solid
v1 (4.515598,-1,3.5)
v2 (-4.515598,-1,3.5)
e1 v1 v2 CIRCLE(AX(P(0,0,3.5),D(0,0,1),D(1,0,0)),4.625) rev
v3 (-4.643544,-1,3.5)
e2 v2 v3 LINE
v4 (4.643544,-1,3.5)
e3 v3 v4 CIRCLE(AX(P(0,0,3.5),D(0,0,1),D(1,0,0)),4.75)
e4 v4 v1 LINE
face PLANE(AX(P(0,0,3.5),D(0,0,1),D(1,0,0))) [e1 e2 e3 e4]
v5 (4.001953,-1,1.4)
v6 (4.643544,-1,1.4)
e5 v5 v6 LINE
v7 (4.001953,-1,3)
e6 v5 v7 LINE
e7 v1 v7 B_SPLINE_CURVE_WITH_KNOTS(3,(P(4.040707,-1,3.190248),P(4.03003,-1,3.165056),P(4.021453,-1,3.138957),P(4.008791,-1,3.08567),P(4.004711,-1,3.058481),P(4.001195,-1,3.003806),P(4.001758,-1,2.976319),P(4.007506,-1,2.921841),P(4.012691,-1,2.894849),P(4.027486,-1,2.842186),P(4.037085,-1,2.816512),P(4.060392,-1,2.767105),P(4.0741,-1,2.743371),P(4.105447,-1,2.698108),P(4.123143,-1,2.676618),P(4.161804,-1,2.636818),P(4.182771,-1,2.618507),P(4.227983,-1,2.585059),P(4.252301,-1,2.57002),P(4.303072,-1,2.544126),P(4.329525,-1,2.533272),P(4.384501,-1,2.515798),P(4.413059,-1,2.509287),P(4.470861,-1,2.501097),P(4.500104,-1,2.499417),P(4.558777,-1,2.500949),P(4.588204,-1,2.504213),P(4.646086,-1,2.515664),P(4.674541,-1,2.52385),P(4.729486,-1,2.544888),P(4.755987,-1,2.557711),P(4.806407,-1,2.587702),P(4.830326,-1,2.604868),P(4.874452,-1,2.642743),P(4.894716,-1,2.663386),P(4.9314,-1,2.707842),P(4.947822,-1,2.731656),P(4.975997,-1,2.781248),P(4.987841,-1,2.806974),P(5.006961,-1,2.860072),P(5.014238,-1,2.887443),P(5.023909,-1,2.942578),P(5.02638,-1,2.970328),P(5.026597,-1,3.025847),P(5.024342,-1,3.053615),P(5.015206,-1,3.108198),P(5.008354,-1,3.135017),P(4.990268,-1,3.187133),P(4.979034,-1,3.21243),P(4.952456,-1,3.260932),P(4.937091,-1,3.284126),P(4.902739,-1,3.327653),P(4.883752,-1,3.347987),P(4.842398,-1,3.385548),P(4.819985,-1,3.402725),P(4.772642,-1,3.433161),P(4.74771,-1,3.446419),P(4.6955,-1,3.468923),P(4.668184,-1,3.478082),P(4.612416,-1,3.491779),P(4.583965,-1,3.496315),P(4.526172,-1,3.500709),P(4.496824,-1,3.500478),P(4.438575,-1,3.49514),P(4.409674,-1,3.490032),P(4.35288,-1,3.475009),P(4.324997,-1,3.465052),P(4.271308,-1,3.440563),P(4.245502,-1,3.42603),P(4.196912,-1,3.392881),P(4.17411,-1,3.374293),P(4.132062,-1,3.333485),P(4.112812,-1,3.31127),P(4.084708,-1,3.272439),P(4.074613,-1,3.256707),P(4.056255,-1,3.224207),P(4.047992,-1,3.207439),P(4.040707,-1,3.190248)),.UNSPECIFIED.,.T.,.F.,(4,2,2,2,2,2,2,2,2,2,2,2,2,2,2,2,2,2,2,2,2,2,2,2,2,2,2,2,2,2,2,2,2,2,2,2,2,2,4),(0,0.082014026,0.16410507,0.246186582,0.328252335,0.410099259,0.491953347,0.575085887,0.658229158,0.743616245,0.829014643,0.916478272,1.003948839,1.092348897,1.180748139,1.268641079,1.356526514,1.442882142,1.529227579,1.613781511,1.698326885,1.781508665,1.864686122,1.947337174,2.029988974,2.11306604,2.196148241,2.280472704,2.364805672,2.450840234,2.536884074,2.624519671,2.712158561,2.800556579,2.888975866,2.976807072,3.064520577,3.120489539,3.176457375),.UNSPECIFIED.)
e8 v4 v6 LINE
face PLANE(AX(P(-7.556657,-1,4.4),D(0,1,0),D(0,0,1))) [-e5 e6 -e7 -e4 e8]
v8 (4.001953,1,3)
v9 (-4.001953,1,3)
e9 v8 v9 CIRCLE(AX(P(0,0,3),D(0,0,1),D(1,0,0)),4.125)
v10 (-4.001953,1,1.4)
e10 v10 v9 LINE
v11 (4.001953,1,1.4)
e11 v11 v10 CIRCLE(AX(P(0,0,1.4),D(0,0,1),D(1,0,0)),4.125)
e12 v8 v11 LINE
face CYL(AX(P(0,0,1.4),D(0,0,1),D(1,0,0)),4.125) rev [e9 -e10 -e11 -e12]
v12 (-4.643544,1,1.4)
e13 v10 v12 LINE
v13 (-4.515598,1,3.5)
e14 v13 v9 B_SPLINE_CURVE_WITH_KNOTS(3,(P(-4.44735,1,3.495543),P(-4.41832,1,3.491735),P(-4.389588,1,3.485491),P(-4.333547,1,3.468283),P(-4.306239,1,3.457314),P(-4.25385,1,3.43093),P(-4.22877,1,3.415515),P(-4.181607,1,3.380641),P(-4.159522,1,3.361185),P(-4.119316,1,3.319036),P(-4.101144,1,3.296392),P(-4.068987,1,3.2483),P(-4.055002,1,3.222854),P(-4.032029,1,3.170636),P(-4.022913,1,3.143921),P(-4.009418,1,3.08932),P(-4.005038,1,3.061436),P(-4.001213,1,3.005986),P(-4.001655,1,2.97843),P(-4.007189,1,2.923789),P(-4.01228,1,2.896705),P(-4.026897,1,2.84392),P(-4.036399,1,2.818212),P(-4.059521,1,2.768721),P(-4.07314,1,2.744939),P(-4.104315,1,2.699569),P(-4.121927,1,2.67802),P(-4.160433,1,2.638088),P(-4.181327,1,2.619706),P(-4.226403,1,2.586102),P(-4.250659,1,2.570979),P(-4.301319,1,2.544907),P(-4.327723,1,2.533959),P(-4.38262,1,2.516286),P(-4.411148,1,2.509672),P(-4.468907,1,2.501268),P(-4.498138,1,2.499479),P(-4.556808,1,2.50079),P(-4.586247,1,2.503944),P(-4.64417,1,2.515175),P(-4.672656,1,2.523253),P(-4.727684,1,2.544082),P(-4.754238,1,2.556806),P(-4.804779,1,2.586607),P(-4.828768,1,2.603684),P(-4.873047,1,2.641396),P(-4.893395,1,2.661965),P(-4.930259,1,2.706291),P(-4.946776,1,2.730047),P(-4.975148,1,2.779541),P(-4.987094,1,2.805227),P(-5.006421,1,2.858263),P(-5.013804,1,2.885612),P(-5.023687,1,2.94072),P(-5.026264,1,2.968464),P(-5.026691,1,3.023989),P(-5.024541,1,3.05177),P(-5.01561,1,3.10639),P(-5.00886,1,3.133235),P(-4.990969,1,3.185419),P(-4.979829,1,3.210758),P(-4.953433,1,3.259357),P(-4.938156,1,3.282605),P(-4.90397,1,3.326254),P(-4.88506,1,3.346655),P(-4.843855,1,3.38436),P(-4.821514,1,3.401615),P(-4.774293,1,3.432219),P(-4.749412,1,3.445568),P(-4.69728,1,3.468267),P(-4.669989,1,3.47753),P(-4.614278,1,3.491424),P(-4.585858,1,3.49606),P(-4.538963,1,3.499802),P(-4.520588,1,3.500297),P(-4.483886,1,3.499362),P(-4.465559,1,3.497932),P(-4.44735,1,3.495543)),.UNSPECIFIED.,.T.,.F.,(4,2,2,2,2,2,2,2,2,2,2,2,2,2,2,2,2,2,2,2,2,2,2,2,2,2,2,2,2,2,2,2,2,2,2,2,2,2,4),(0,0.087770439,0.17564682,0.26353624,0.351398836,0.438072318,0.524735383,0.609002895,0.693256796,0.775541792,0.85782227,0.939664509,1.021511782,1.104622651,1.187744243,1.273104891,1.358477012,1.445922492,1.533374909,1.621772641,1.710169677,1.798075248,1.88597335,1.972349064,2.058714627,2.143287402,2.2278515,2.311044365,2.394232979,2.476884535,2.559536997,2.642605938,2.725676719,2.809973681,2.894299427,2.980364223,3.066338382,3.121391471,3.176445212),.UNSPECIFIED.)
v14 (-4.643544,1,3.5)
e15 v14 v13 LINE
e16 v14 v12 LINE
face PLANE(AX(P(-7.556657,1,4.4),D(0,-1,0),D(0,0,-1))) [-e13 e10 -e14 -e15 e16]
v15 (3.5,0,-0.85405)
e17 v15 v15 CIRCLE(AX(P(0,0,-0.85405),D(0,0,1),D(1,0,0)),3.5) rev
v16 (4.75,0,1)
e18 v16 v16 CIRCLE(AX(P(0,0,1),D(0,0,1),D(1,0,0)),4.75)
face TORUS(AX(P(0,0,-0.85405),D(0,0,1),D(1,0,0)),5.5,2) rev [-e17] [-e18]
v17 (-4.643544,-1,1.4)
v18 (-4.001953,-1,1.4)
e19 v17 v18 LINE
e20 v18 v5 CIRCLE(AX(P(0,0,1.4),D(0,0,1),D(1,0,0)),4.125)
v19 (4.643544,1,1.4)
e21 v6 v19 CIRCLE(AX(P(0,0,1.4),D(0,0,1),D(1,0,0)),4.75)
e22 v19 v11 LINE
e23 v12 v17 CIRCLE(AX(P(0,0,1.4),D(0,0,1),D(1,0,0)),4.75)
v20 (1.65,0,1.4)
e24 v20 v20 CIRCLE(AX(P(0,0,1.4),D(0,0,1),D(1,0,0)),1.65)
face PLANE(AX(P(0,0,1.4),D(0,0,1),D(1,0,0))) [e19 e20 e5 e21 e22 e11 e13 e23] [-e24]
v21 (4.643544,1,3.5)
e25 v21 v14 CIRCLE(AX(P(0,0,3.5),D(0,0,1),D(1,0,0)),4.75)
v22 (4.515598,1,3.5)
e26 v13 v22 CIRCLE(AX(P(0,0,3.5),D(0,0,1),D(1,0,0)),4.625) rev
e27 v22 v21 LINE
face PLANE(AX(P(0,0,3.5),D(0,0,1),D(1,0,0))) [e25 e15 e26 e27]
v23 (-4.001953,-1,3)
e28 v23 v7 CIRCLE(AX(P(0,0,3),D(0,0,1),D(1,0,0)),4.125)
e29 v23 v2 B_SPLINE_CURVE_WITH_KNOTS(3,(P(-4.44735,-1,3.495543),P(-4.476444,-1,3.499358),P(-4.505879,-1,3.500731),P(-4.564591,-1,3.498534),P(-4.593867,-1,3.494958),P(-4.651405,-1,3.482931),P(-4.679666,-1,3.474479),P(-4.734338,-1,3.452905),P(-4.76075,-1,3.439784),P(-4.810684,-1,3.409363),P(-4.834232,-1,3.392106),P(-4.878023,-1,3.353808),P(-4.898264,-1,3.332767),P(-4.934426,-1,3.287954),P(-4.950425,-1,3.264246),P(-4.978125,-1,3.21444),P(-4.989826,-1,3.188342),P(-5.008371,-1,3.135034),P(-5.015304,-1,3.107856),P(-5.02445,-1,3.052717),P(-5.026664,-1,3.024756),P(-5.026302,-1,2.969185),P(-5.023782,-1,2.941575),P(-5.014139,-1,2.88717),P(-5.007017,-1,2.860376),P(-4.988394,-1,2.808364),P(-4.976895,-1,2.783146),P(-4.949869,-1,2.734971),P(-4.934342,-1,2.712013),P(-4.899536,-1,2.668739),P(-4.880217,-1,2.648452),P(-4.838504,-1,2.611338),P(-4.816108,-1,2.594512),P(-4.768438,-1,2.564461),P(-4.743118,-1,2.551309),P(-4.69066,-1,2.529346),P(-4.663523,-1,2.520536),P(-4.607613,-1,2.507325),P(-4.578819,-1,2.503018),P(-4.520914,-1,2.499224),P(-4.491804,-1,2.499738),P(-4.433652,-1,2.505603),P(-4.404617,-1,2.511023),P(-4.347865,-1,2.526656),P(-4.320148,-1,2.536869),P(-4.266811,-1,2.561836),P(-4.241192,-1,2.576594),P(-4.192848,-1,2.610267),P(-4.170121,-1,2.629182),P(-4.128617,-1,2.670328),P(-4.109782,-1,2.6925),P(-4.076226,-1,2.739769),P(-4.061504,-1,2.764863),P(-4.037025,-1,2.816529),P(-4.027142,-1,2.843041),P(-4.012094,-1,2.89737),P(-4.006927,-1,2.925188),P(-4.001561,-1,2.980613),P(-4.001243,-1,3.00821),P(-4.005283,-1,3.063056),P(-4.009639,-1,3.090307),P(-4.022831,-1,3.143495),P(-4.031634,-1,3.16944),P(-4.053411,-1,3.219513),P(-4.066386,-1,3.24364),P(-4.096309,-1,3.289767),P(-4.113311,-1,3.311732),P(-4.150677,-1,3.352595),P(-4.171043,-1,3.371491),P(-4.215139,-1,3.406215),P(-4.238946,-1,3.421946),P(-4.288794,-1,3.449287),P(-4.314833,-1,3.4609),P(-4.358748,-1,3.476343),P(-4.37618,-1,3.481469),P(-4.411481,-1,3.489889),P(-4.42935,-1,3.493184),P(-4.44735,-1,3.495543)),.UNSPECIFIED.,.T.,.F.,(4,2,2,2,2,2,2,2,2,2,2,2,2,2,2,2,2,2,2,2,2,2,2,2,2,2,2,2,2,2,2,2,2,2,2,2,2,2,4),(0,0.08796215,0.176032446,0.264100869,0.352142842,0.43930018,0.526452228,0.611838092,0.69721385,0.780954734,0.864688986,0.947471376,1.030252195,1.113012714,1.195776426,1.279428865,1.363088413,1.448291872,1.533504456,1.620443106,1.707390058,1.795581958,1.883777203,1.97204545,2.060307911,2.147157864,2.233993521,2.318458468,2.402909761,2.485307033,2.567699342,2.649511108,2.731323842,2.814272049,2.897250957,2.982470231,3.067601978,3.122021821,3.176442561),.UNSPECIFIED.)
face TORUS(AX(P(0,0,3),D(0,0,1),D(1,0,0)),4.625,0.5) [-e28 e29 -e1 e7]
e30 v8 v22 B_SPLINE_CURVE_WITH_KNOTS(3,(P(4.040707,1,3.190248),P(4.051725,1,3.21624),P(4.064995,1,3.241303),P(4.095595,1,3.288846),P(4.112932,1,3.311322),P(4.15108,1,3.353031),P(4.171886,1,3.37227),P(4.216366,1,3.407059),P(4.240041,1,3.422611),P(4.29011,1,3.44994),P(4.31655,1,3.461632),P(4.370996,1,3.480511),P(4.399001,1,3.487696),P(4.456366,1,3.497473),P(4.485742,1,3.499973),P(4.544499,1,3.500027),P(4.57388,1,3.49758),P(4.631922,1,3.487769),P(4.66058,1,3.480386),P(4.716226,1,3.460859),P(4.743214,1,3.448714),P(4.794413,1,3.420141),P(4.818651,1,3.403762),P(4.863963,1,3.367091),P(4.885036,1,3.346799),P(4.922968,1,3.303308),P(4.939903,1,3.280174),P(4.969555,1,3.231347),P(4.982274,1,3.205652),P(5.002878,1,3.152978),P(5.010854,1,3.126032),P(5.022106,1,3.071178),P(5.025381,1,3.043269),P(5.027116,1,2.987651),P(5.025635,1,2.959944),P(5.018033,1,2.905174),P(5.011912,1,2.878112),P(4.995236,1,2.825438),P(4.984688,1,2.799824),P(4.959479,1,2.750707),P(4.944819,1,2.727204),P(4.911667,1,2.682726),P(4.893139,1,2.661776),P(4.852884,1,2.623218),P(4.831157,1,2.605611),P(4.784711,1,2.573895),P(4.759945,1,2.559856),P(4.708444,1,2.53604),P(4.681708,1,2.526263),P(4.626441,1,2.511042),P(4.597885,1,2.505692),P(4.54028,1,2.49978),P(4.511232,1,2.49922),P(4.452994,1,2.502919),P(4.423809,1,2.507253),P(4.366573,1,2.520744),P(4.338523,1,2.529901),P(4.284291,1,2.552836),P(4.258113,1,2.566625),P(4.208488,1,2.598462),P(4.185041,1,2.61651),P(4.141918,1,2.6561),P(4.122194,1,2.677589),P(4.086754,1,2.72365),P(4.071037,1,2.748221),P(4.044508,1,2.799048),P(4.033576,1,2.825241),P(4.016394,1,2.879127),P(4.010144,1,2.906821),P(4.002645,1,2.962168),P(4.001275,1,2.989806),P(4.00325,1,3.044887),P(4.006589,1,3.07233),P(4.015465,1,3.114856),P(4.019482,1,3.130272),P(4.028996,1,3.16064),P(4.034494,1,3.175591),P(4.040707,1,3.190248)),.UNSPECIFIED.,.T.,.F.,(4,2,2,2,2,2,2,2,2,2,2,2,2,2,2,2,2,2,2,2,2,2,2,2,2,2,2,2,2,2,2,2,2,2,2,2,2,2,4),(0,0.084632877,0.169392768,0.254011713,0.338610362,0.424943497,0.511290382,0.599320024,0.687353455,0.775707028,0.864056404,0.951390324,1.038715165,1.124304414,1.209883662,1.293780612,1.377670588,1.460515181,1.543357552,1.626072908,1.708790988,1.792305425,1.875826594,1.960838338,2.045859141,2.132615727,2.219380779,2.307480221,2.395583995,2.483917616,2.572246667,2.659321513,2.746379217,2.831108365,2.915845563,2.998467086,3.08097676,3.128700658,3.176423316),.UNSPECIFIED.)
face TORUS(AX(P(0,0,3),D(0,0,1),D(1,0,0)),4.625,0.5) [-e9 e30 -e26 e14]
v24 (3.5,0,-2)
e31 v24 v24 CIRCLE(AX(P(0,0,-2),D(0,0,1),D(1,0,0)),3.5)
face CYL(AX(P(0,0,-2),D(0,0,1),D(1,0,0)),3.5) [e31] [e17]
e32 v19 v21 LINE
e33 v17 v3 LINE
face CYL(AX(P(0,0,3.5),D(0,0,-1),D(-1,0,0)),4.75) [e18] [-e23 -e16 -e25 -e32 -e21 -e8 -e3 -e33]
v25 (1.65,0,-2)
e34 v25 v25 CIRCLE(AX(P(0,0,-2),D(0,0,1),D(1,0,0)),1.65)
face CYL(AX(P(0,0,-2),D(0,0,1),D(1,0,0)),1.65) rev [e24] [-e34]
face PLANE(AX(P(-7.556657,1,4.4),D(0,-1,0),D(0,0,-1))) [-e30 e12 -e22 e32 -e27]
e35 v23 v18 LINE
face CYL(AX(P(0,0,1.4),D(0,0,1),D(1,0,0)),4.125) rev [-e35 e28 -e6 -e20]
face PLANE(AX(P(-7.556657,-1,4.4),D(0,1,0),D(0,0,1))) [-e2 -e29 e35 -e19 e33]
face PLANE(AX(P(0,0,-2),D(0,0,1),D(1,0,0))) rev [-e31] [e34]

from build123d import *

# Parameters (mm, degrees)
BOSS_EXTRUDE1_DEPTH      = 1
BOSS_EXTRUDE1_DEPTH_BACK = 2
SKETCH1_R                = 3.5
SKETCH1_R_2              = 1.65
SKETCH2_R                = 4.75
BOSS_EXTRUDE2_DEPTH      = 2.5
SKETCH3_R                = 4.125
CUT_EXTRUDE1_DEPTH       = 2.1
FILLET1_R                = 0.5
SKETCH4_R                = 1.65
CUT_EXTRUDE2_DEPTH       = 10
SKETCH5_W                = 15.11331488
SKETCH5_H                = 2
CUT_EXTRUDE3_DEPTH       = 3
FILLET2_R                = 2


with BuildPart() as part:
    # Sketch1 → Boss-Extrude1 (new, two sides: drawn at the far end of the back side and taken through both)
    with BuildSketch(Plane.XY.offset(-BOSS_EXTRUDE1_DEPTH_BACK)):
        Circle(SKETCH1_R)
        Circle(SKETCH1_R_2, mode=Mode.SUBTRACT)
    extrude(amount=BOSS_EXTRUDE1_DEPTH + BOSS_EXTRUDE1_DEPTH_BACK)

    # Sketch2 → Boss-Extrude2 (add)
    with BuildSketch(Plane.XY.offset(1)):
        Circle(SKETCH2_R)
    extrude(amount=BOSS_EXTRUDE2_DEPTH)

    # Sketch3 → Cut-Extrude1 (cut)
    with BuildSketch(Plane.XY.offset(3.5)):
        Circle(SKETCH3_R)
    extrude(amount=-CUT_EXTRUDE1_DEPTH, mode=Mode.SUBTRACT)

    # Fillet1
    fillet1_edges = [part.edges().sort_by_distance(p)[0] for p in [
        (-4.125, 0, 3.5),
    ]]
    fillet(fillet1_edges, radius=FILLET1_R)

    # Sketch4 → Cut-Extrude2 (cut)
    with BuildSketch(Plane(origin=(0, 0, -2), x_dir=(-1, 0, 0), z_dir=(0, 0, -1))):
        with Locations(Location((0, 0, 0), (0, 0, 180))):
            Circle(SKETCH4_R)
    extrude(amount=-CUT_EXTRUDE2_DEPTH, mode=Mode.SUBTRACT)

    # Sketch5 → Cut-Extrude3 (cut)
    with BuildSketch(Plane.XY.offset(1.4)):
        Rectangle(SKETCH5_W, SKETCH5_H)
    extrude(amount=CUT_EXTRUDE3_DEPTH, mode=Mode.SUBTRACT)

    # Fillet2
    # the kernel refuses this fillet: 2 mm, written as the material it adds along each edge
    with BuildSketch(Plane(origin=(0, 0, 1), x_dir=(1, 0, 0), z_dir=(0, -1, 0))) as fillet2_piece_1:
        with BuildLine():
            CenterArc((5.5, -1.854049622), FILLET2_R, 112.024312837, 67.975687163)
            Line((4.75, 0), (4.735, 0.037080992))
            ThreePointArc((4.735, 0.037080992), (4.125, 0.04), (3.5, 0.04))
            Line((3.5, 0.04), (3.46, 0))
            Line((3.46, 0), (3.46, -1.854049622))
            Line((3.46, -1.854049622), (3.5, -1.854049622))
        make_face()
    revolve(axis=Axis((0, 0, 1), (0, 0, 1)))


solid = part.part
